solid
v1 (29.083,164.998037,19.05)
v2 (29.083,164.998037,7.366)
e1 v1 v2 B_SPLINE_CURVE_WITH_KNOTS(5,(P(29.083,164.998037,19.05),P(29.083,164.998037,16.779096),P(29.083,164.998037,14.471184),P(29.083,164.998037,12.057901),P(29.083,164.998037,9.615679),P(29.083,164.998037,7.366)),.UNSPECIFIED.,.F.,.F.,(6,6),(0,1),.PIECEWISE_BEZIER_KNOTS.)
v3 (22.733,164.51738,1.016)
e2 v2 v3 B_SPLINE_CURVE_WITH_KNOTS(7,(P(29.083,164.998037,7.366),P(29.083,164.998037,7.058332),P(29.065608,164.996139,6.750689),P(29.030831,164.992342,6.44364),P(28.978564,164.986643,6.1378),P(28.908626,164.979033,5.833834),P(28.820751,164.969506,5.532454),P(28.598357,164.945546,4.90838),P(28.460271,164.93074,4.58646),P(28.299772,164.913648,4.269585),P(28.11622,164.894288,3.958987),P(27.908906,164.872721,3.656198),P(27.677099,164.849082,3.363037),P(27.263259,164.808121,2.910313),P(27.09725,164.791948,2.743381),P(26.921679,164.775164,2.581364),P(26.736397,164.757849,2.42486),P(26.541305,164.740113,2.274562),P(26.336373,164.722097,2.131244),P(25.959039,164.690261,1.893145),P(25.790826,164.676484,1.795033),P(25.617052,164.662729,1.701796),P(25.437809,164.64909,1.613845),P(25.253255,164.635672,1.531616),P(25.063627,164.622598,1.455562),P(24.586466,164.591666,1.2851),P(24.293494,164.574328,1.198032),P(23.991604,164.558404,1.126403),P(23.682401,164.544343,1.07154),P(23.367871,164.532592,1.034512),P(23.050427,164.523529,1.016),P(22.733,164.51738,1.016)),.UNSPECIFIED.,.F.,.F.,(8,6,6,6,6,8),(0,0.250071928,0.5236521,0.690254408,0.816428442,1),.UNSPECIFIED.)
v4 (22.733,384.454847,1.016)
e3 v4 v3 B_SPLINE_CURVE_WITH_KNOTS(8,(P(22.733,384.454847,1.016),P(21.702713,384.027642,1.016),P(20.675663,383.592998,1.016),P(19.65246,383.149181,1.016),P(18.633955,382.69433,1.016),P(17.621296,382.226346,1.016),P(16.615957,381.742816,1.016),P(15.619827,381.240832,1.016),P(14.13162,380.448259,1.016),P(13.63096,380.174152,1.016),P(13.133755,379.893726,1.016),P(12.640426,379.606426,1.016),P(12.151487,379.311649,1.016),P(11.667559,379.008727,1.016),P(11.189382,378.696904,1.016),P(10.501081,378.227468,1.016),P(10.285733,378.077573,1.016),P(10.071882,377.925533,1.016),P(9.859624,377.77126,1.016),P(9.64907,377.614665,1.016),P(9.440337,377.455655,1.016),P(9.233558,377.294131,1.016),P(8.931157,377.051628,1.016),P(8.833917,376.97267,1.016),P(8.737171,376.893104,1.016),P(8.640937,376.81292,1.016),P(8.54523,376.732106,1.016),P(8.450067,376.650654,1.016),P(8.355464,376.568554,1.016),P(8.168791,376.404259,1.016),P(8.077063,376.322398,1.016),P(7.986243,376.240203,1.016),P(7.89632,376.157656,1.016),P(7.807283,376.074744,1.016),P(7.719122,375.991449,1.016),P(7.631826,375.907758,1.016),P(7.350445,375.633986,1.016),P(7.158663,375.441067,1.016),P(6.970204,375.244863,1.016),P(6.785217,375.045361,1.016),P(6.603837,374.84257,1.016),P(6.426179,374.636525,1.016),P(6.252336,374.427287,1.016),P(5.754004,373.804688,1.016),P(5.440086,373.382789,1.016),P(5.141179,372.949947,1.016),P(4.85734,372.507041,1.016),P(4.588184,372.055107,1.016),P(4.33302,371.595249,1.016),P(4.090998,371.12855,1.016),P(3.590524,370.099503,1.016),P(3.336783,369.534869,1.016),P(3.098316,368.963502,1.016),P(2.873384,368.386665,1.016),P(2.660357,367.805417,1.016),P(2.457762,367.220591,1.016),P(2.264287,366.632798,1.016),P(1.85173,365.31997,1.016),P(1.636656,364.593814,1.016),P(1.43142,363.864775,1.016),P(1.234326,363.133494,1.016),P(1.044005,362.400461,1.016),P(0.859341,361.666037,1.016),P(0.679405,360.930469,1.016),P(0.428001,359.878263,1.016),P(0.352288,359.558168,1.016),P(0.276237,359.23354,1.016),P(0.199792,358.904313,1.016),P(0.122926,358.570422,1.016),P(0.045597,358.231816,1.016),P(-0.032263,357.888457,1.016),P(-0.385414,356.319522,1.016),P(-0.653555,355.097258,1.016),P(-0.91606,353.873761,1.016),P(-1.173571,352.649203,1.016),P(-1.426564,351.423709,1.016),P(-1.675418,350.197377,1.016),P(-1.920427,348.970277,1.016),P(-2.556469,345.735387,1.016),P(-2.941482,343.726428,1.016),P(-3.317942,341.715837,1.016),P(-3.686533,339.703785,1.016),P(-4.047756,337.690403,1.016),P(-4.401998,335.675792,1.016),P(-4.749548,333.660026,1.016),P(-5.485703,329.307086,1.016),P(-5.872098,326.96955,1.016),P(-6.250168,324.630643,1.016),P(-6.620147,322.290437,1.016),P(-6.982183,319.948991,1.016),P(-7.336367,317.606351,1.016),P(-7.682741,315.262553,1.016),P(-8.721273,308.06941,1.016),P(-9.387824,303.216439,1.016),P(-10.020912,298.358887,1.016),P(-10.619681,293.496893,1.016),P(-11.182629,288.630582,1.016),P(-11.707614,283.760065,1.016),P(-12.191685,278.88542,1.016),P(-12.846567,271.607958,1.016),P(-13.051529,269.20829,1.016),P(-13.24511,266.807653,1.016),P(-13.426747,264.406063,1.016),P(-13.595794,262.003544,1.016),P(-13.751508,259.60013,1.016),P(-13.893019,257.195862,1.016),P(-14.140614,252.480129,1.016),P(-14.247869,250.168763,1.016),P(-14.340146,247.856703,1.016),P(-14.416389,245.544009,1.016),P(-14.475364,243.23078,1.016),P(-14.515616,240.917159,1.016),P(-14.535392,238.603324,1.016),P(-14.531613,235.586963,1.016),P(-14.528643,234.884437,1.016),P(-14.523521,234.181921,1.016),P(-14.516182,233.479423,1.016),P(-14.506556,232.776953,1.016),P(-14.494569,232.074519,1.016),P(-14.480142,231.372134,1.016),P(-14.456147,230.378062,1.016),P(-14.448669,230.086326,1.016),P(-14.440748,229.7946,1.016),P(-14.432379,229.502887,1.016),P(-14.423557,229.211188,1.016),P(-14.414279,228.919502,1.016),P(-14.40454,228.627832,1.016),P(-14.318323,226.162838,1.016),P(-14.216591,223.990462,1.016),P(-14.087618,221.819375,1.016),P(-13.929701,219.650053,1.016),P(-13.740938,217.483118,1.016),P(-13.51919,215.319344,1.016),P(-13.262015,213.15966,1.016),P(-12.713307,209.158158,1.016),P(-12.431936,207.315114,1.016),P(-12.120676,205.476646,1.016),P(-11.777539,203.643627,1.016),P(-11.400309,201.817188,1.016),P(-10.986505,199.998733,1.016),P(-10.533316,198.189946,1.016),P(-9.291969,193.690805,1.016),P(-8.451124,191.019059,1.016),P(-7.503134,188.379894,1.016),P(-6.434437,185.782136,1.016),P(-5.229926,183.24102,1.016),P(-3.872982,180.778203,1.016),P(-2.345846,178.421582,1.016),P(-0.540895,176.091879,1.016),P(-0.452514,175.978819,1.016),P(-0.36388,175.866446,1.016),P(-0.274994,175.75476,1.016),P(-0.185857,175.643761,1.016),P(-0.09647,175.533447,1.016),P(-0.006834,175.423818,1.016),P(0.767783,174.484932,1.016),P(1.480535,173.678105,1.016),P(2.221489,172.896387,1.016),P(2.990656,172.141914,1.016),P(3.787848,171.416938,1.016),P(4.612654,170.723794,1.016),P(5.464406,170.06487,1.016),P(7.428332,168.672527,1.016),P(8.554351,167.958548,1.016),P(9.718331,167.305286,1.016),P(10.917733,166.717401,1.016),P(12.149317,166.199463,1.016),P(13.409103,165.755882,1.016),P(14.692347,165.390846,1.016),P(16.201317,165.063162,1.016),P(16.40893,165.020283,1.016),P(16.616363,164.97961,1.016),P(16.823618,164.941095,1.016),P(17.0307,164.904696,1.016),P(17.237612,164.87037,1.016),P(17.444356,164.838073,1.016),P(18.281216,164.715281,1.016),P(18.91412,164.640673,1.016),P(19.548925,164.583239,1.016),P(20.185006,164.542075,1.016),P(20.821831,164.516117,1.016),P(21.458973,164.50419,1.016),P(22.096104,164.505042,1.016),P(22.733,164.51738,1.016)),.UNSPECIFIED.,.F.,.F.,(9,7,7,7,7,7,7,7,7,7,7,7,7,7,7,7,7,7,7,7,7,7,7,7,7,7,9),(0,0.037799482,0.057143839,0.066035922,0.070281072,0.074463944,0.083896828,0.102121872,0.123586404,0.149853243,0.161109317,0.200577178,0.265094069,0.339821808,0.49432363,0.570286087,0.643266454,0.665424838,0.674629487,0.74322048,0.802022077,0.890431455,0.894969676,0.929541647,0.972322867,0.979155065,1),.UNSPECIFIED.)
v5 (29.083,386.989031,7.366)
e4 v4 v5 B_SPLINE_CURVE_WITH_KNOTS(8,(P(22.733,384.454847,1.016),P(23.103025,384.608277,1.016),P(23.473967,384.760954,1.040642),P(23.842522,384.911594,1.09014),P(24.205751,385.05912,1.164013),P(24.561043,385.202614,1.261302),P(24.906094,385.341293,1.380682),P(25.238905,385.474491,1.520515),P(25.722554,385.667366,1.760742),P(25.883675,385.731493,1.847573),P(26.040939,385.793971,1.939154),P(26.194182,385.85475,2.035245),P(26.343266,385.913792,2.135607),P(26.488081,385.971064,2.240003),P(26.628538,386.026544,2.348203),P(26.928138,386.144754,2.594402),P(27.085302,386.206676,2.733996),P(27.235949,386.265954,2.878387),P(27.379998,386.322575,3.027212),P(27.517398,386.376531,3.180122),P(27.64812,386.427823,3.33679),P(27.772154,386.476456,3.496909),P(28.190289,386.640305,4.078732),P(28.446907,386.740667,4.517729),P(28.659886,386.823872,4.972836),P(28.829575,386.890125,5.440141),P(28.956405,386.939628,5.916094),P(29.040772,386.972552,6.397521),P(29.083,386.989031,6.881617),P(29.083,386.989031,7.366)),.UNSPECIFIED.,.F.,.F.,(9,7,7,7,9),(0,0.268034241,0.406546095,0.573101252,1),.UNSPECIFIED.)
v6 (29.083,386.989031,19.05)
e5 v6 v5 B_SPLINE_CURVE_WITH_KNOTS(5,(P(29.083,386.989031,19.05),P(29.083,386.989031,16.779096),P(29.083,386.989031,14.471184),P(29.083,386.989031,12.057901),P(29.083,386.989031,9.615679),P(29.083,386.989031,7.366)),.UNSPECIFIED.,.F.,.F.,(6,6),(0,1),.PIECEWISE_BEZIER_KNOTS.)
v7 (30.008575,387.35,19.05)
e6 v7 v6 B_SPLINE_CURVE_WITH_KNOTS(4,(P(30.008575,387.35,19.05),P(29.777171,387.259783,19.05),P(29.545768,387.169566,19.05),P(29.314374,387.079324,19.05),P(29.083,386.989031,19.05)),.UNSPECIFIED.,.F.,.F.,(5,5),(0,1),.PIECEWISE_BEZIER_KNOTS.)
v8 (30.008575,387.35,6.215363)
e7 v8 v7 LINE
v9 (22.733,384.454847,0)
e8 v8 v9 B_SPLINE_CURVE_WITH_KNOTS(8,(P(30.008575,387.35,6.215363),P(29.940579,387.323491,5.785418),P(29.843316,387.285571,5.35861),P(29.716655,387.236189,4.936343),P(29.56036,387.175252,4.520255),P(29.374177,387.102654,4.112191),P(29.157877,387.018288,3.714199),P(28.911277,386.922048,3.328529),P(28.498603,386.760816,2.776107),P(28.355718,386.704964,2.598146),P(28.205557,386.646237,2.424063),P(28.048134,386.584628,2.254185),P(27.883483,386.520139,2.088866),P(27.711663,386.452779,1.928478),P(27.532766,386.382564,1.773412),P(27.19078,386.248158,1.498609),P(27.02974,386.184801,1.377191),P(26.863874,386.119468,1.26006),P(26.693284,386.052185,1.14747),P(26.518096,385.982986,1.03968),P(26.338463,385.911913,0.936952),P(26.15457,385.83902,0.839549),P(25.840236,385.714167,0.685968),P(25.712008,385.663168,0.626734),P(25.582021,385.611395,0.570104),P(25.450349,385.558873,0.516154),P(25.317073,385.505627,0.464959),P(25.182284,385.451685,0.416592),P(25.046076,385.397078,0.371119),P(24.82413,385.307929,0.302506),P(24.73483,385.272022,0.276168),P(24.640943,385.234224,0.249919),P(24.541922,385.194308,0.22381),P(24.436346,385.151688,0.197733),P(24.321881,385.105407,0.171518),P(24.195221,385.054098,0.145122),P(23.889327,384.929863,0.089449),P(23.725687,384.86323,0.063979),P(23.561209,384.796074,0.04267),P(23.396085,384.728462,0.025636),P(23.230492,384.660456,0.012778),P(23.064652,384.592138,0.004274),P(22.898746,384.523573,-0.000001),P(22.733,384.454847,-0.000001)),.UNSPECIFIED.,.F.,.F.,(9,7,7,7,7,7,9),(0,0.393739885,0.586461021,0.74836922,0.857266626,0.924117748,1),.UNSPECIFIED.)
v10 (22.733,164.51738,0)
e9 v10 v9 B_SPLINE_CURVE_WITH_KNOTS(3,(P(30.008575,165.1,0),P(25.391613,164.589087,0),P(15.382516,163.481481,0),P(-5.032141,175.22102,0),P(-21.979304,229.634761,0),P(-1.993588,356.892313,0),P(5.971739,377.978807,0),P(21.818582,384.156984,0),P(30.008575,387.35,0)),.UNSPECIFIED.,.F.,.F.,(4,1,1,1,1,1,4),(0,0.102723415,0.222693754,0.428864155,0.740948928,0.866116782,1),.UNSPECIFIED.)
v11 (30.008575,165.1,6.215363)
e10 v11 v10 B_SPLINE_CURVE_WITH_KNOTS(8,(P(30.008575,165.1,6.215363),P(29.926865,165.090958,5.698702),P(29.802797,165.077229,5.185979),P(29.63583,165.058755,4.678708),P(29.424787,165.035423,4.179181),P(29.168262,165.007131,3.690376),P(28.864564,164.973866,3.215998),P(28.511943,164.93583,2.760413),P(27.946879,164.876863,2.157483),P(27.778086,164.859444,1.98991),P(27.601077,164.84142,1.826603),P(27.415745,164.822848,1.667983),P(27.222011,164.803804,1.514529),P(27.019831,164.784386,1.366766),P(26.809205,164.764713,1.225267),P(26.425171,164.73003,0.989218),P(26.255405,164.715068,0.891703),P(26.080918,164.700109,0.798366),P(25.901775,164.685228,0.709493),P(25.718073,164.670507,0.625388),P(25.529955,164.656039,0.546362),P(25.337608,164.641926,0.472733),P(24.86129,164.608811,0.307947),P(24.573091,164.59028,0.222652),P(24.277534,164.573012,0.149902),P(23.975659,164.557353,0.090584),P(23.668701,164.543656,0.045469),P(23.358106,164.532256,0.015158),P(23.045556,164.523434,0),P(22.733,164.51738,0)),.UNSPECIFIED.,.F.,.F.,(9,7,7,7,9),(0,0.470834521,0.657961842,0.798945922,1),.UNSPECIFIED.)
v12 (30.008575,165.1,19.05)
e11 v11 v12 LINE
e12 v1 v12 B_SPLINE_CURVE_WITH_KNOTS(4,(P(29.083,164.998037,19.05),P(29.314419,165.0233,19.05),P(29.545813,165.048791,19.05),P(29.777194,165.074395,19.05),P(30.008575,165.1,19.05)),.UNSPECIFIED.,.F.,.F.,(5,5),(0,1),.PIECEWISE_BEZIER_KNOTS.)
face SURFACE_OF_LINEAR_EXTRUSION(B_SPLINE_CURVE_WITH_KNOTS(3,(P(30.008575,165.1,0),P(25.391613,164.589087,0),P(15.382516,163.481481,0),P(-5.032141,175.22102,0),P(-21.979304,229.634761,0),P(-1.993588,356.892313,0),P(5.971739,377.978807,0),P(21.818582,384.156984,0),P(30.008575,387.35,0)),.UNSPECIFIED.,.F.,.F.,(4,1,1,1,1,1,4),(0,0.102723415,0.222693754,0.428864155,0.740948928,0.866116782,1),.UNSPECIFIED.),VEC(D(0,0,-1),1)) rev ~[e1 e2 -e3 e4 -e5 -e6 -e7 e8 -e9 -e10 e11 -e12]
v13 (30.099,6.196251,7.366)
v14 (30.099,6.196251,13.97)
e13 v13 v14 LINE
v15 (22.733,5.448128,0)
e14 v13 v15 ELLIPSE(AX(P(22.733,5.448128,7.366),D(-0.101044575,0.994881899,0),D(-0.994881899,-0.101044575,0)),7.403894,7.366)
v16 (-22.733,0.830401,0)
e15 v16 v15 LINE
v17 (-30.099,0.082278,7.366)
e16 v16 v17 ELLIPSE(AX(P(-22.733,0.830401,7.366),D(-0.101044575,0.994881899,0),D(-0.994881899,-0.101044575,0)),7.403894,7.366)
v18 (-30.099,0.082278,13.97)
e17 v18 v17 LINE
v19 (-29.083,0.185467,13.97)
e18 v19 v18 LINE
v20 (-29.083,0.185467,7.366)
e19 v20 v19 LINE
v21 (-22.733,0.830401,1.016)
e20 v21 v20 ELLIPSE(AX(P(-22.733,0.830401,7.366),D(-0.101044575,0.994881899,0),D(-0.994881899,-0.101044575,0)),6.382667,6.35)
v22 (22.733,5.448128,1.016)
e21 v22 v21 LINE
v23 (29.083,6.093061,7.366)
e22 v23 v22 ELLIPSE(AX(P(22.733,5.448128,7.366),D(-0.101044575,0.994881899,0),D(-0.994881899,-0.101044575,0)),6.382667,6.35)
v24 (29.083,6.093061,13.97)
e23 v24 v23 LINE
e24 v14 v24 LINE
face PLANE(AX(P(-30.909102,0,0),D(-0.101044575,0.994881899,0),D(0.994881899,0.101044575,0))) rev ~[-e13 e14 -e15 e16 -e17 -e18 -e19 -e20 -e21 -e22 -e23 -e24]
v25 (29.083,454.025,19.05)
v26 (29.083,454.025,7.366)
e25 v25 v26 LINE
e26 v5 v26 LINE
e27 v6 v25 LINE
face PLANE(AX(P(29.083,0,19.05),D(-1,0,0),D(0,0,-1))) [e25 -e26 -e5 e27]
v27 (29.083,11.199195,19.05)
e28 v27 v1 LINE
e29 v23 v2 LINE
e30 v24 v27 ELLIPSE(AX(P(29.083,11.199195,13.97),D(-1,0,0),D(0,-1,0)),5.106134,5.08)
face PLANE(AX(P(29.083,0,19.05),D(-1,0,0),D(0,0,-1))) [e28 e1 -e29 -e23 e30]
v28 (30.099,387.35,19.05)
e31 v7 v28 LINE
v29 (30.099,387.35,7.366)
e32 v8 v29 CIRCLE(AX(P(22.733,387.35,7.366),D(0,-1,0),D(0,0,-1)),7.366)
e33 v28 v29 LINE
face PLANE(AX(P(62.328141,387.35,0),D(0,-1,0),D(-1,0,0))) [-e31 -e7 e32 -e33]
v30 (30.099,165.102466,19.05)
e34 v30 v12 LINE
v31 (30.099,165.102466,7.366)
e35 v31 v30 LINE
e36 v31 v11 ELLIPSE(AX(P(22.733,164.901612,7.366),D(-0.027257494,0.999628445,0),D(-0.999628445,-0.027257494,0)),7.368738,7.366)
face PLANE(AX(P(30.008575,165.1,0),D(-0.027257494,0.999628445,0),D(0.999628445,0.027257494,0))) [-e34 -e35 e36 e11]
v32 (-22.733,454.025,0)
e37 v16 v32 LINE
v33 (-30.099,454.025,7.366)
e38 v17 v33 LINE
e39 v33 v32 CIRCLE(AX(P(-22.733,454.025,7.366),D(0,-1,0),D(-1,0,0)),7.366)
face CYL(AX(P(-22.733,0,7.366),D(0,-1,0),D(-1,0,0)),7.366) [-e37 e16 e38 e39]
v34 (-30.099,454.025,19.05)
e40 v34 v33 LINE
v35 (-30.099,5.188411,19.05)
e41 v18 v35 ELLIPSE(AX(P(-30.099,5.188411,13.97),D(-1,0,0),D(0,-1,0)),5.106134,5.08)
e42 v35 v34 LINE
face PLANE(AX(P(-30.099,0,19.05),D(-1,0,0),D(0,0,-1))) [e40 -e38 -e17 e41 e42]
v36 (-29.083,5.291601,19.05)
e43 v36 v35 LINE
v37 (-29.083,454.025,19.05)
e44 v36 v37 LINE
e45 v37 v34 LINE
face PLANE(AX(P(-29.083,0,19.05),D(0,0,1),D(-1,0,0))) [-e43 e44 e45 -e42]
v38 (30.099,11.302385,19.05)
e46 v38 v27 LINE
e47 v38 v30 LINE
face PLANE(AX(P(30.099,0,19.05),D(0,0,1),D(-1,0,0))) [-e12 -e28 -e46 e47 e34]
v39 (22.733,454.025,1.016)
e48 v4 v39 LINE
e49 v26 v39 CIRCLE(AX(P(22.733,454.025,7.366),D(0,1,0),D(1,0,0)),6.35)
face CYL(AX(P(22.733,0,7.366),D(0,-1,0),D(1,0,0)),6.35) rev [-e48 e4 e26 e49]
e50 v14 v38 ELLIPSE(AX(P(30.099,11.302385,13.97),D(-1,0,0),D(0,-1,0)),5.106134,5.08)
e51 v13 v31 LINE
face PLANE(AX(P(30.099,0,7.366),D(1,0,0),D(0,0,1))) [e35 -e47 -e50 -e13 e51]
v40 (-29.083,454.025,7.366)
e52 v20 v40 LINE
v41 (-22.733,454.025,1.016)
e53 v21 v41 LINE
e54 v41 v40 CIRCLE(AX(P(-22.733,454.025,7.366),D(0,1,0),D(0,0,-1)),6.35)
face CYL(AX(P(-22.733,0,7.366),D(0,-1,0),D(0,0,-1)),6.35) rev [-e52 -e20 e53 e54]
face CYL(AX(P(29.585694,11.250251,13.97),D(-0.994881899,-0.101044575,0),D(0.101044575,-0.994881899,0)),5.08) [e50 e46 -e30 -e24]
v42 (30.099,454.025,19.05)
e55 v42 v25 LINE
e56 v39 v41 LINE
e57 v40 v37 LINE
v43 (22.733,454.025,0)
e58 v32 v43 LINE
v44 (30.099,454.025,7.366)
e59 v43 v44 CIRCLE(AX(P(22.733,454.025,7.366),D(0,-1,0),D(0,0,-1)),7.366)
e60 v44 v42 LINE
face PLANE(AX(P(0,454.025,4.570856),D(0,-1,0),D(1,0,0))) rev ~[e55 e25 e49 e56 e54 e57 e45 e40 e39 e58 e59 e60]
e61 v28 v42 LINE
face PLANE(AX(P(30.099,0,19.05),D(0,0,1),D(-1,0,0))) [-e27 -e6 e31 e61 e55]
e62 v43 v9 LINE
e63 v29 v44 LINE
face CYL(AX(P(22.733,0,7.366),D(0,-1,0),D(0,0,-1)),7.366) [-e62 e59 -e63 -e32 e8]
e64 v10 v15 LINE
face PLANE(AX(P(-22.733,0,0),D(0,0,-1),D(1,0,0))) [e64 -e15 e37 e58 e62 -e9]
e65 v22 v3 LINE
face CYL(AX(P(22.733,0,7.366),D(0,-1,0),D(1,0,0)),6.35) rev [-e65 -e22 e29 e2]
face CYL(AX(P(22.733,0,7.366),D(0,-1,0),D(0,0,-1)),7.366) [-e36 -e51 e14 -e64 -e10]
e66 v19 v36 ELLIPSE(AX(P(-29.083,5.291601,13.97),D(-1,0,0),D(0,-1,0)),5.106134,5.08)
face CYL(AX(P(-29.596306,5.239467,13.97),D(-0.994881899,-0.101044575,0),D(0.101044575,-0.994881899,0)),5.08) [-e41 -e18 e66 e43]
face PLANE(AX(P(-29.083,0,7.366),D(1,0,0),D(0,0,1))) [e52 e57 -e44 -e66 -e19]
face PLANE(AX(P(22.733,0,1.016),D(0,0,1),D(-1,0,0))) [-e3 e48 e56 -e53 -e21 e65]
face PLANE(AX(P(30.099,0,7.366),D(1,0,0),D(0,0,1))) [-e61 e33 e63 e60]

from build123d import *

# Parameters (mm, degrees)
F1_DEPTH      = 454.025
F3_DEPTH      = 19.051
F3_DEPTH_BACK = 686
F5_DEPTH      = 687
F5_DEPTH_BACK = 19.051
F6_R          = 5.08


# Not quite as in the source:
# - an extrude ends at something that could not be found from the text; its depth is read off the source's solid


with BuildPart() as f1:
    # F0 (on Front) → F1 (new body)
    with BuildSketch(Plane.XZ):
        with BuildLine():
            Line((29.083, 19.05), (29.083, 7.366))
            ThreePointArc((29.083, 7.366), (27.2231280605, 2.8758719395), (22.733, 1.016))
            Line((22.733, 1.016), (0, 1.016))
            Line((0, 1.016), (-22.733, 1.016))
            ThreePointArc((-22.733, 1.016), (-27.2231280605, 2.8758719395), (-29.083, 7.366))
            Line((-29.083, 7.366), (-29.083, 19.05))
            Line((-29.083, 19.05), (-30.099, 19.05))
            Line((-30.099, 19.05), (-30.099, 7.366))
            ThreePointArc((-30.099, 7.366), (-27.9415485502, 2.1574514498), (-22.733, 0))
            Line((-22.733, 0), (0, 0))
            Line((0, 0), (22.733, 0))
            ThreePointArc((22.733, 0), (27.9415485502, 2.1574514498), (30.099, 7.366))
            Line((30.099, 7.366), (30.099, 19.05))
            Line((30.099, 19.05), (29.083, 19.05))
        make_face()
    extrude(amount=-F1_DEPTH)

    # F2 (on face) → F3 (cut, two sides)
    with BuildSketch(Plane(origin=(0, 0, 0), x_dir=(1, 0, 0), z_dir=(0, 0, -1))) as f3_sk:
        Polygon((30.6164417416, -6.2488044892), (30.6164417416, 0), (-30.9091024101, 0), align=None)
    extrude(amount=-F3_DEPTH, mode=Mode.SUBTRACT)
    extrude(f3_sk.sketch, amount=F3_DEPTH_BACK, mode=Mode.SUBTRACT)

    # F4 (on Top) → F5 (cut, two sides)
    with BuildSketch(Plane.XY) as f5_sk:
        with BuildLine():
            Line((62.3281411827, 387.35), (30.0085749477, 387.35))
            add(Edge.make_bspline(
                [(30.0085749477, 165.1), (25.391612917, 164.5890872008), (15.3825161545, 163.4814810281), (-5.0321407016, 175.2210203018), (-21.9793035432, 229.6347611818), (-1.9935882921, 356.8923129343), (5.9717389451, 377.9788071194), (21.8185822716, 384.1569840369), (30.0085749477, 387.35)],
                knots=[0, 0, 0, 0, 0.1027234154, 0.2226937536, 0.4288641549, 0.7409489277, 0.8661167817, 1, 1, 1, 1], degree=3))
            Line((30.0085749477, 165.1), (62.3281411827, 165.9812778234))
            Line((62.3281411827, 165.9812778234), (62.3281411827, 387.35))
        make_face()
    extrude(amount=-F5_DEPTH, mode=Mode.SUBTRACT)
    extrude(f5_sk.sketch, amount=F5_DEPTH_BACK, mode=Mode.SUBTRACT)

    # F6
    f6_edges = [f1.edges().sort_by_distance(p)[0] for p in [
        (-29.591, 0.133872, 19.05),
        (29.591, 6.144656, 19.05),
    ]]
    fillet(f6_edges, radius=F6_R)


solid = f1.part
